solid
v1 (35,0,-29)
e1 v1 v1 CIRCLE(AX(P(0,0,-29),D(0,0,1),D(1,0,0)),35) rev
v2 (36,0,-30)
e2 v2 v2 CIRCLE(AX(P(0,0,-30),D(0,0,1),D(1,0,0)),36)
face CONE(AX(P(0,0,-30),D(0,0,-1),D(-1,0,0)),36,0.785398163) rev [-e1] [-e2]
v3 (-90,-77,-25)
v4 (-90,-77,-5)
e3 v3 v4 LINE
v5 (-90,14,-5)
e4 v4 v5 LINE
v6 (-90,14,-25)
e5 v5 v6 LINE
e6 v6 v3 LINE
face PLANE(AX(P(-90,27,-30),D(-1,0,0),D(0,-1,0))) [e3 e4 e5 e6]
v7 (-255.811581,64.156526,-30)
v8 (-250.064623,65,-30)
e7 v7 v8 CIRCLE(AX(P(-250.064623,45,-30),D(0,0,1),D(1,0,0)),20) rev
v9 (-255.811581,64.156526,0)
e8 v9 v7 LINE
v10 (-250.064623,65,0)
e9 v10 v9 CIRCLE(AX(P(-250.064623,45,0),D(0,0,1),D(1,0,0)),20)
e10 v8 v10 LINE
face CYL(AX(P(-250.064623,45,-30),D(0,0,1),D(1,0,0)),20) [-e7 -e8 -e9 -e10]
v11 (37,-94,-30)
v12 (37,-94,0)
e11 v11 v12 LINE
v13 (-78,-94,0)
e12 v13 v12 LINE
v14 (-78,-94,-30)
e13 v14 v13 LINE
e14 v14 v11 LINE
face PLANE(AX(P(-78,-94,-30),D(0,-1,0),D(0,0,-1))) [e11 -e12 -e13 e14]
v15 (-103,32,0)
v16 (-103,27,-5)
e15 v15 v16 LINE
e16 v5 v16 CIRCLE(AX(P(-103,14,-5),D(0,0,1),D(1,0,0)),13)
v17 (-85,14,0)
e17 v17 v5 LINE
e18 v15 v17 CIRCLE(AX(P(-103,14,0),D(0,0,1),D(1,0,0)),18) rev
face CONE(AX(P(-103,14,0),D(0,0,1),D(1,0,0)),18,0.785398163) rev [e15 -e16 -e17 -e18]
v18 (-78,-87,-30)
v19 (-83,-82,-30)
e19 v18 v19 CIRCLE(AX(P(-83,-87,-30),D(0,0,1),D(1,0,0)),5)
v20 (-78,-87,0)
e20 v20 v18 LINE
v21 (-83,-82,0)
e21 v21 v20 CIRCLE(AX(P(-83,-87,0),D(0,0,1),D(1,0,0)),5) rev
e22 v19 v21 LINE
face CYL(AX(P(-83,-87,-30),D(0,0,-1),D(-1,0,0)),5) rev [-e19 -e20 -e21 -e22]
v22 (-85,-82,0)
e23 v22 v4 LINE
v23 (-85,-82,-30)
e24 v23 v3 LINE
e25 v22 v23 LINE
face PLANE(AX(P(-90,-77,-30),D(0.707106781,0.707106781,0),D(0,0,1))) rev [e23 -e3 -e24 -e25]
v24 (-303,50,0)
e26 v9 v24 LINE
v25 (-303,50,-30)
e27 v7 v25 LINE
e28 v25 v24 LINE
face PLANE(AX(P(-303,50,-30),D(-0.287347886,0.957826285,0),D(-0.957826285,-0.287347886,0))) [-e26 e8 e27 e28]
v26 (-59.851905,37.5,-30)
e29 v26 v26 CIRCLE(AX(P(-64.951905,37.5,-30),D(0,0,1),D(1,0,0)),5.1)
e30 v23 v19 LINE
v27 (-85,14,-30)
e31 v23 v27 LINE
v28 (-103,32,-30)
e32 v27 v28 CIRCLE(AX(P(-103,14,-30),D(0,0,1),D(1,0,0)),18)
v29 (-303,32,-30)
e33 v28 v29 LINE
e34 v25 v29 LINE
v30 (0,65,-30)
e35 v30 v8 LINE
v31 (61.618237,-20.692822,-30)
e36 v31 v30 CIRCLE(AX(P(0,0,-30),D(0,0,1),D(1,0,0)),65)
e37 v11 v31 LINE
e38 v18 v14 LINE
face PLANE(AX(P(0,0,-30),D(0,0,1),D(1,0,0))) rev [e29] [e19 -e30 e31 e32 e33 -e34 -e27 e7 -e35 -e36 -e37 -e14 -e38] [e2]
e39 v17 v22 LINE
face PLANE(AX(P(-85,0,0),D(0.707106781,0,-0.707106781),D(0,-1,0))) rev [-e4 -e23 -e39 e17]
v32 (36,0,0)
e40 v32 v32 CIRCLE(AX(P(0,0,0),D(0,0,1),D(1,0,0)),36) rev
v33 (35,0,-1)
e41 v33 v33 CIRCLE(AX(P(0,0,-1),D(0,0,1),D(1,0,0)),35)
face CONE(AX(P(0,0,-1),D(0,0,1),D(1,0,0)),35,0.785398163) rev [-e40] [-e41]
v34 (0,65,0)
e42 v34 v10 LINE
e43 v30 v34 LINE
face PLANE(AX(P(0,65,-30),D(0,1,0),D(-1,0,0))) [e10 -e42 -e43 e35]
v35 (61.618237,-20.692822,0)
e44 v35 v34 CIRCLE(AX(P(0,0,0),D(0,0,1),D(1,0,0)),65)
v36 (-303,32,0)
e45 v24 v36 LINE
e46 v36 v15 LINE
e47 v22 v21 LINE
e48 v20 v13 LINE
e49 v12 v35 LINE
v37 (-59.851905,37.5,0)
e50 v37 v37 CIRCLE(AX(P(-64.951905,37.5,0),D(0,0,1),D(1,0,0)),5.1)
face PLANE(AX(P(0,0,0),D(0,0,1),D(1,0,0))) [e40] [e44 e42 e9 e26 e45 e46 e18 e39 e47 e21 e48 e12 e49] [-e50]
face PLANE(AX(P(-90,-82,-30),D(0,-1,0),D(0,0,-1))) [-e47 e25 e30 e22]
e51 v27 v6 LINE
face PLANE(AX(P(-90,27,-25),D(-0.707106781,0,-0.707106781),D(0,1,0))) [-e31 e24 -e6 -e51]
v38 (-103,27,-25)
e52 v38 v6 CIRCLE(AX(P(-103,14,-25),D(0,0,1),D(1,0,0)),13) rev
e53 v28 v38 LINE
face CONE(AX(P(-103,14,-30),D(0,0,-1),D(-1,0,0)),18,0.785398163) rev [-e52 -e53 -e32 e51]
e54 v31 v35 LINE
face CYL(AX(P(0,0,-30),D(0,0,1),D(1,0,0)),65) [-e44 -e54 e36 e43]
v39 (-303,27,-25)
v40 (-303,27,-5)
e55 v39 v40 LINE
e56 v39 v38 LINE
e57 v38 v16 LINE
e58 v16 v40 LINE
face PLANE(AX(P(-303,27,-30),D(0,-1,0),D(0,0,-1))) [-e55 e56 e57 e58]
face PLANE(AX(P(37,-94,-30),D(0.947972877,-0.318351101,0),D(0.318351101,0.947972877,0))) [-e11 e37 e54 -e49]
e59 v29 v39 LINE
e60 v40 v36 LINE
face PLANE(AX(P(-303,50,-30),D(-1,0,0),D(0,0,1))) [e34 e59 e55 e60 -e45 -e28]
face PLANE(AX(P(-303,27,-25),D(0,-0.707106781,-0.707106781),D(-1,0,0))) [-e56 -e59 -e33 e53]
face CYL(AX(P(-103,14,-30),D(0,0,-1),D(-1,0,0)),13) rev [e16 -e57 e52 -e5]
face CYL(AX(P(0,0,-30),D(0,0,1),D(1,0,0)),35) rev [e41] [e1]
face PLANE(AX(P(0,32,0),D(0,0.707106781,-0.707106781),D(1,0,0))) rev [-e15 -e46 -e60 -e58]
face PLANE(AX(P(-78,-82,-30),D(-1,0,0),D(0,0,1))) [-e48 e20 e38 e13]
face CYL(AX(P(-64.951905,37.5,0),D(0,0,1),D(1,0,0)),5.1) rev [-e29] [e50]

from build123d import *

# Parameters (mm, degrees)
SKETCH_1_R             = 35
SM_BASE_FLANGE_1_DEPTH = 30
FILLET_1_R             = 20
FILLET_2_R             = 13
FILLET_3_R             = 5
HOLE_WIZARD_M12_1_D    = 10.2
CHAMFER_1_SIZE         = 5
CHAMFER_2_SIZE         = 1


# Sheet-metal steps are written as plain solids
with BuildPart() as part:
    # Sketch 1 → 基体-法兰1 (new body)
    with BuildSketch(Plane.XY):
        with BuildLine():
            Line((-303, 50), (-303, 27))
            Line((-303, 27), (-90, 27))
            Line((-90, 27), (-90, -82))
            Line((-90, -82), (-78, -82))
            Line((-78, -82), (-78, -94))
            Line((-78, -94), (37, -94))
            Line((37, -94), (61.618237028, -20.692821595))
            ThreePointArc((61.618237028, -20.692821595), (52.77325745, 37.947111855), (0, 65))
            Line((0, 65), (-253, 65))
            Line((-253, 65), (-303, 50))
        make_face()
        Circle(SKETCH_1_R, mode=Mode.SUBTRACT)
    extrude(amount=-SM_BASE_FLANGE_1_DEPTH)

    # 圆角1
    fillet_1_edges = [part.edges().sort_by_distance(p)[0] for p in [
        (-253, 65, -15),
    ]]
    fillet(fillet_1_edges, radius=FILLET_1_R)

    # 圆角2
    fillet_2_edges = [part.edges().sort_by_distance(p)[0] for p in [
        (-90, 27, -15),
    ]]
    fillet(fillet_2_edges, radius=FILLET_2_R)

    # 圆角3
    fillet_3_edges = [part.edges().sort_by_distance(p)[0] for p in [
        (-78, -82, -15),
    ]]
    fillet(fillet_3_edges, radius=FILLET_3_R)

    # M12 螺纹孔1 (through all)
    with Locations(Plane.XY):
        with Locations((-64.951905284, 37.5)):
            Hole(HOLE_WIZARD_M12_1_D / 2)

    # 倒角1
    chamfer_1_edges = [part.edges().sort_by_distance(p)[0] for p in [
        (-203, 27, 0),
        (-90, -82, -15),
        (-203, 27, -30),
        (-90, -34, 0),
        (-90, -34, -30),
        (-93.807611845, 23.192388155, 0),
        (-93.807611845, 23.192388155, -30),
    ]]
    chamfer(chamfer_1_edges, length=CHAMFER_1_SIZE)

    # 倒角2
    chamfer_2_edges = [part.edges().sort_by_distance(p)[0] for p in [
        (-35, 0, -30),
        (-35, 0, 0),
    ]]
    chamfer(chamfer_2_edges, length=CHAMFER_2_SIZE)


solid = part.part
